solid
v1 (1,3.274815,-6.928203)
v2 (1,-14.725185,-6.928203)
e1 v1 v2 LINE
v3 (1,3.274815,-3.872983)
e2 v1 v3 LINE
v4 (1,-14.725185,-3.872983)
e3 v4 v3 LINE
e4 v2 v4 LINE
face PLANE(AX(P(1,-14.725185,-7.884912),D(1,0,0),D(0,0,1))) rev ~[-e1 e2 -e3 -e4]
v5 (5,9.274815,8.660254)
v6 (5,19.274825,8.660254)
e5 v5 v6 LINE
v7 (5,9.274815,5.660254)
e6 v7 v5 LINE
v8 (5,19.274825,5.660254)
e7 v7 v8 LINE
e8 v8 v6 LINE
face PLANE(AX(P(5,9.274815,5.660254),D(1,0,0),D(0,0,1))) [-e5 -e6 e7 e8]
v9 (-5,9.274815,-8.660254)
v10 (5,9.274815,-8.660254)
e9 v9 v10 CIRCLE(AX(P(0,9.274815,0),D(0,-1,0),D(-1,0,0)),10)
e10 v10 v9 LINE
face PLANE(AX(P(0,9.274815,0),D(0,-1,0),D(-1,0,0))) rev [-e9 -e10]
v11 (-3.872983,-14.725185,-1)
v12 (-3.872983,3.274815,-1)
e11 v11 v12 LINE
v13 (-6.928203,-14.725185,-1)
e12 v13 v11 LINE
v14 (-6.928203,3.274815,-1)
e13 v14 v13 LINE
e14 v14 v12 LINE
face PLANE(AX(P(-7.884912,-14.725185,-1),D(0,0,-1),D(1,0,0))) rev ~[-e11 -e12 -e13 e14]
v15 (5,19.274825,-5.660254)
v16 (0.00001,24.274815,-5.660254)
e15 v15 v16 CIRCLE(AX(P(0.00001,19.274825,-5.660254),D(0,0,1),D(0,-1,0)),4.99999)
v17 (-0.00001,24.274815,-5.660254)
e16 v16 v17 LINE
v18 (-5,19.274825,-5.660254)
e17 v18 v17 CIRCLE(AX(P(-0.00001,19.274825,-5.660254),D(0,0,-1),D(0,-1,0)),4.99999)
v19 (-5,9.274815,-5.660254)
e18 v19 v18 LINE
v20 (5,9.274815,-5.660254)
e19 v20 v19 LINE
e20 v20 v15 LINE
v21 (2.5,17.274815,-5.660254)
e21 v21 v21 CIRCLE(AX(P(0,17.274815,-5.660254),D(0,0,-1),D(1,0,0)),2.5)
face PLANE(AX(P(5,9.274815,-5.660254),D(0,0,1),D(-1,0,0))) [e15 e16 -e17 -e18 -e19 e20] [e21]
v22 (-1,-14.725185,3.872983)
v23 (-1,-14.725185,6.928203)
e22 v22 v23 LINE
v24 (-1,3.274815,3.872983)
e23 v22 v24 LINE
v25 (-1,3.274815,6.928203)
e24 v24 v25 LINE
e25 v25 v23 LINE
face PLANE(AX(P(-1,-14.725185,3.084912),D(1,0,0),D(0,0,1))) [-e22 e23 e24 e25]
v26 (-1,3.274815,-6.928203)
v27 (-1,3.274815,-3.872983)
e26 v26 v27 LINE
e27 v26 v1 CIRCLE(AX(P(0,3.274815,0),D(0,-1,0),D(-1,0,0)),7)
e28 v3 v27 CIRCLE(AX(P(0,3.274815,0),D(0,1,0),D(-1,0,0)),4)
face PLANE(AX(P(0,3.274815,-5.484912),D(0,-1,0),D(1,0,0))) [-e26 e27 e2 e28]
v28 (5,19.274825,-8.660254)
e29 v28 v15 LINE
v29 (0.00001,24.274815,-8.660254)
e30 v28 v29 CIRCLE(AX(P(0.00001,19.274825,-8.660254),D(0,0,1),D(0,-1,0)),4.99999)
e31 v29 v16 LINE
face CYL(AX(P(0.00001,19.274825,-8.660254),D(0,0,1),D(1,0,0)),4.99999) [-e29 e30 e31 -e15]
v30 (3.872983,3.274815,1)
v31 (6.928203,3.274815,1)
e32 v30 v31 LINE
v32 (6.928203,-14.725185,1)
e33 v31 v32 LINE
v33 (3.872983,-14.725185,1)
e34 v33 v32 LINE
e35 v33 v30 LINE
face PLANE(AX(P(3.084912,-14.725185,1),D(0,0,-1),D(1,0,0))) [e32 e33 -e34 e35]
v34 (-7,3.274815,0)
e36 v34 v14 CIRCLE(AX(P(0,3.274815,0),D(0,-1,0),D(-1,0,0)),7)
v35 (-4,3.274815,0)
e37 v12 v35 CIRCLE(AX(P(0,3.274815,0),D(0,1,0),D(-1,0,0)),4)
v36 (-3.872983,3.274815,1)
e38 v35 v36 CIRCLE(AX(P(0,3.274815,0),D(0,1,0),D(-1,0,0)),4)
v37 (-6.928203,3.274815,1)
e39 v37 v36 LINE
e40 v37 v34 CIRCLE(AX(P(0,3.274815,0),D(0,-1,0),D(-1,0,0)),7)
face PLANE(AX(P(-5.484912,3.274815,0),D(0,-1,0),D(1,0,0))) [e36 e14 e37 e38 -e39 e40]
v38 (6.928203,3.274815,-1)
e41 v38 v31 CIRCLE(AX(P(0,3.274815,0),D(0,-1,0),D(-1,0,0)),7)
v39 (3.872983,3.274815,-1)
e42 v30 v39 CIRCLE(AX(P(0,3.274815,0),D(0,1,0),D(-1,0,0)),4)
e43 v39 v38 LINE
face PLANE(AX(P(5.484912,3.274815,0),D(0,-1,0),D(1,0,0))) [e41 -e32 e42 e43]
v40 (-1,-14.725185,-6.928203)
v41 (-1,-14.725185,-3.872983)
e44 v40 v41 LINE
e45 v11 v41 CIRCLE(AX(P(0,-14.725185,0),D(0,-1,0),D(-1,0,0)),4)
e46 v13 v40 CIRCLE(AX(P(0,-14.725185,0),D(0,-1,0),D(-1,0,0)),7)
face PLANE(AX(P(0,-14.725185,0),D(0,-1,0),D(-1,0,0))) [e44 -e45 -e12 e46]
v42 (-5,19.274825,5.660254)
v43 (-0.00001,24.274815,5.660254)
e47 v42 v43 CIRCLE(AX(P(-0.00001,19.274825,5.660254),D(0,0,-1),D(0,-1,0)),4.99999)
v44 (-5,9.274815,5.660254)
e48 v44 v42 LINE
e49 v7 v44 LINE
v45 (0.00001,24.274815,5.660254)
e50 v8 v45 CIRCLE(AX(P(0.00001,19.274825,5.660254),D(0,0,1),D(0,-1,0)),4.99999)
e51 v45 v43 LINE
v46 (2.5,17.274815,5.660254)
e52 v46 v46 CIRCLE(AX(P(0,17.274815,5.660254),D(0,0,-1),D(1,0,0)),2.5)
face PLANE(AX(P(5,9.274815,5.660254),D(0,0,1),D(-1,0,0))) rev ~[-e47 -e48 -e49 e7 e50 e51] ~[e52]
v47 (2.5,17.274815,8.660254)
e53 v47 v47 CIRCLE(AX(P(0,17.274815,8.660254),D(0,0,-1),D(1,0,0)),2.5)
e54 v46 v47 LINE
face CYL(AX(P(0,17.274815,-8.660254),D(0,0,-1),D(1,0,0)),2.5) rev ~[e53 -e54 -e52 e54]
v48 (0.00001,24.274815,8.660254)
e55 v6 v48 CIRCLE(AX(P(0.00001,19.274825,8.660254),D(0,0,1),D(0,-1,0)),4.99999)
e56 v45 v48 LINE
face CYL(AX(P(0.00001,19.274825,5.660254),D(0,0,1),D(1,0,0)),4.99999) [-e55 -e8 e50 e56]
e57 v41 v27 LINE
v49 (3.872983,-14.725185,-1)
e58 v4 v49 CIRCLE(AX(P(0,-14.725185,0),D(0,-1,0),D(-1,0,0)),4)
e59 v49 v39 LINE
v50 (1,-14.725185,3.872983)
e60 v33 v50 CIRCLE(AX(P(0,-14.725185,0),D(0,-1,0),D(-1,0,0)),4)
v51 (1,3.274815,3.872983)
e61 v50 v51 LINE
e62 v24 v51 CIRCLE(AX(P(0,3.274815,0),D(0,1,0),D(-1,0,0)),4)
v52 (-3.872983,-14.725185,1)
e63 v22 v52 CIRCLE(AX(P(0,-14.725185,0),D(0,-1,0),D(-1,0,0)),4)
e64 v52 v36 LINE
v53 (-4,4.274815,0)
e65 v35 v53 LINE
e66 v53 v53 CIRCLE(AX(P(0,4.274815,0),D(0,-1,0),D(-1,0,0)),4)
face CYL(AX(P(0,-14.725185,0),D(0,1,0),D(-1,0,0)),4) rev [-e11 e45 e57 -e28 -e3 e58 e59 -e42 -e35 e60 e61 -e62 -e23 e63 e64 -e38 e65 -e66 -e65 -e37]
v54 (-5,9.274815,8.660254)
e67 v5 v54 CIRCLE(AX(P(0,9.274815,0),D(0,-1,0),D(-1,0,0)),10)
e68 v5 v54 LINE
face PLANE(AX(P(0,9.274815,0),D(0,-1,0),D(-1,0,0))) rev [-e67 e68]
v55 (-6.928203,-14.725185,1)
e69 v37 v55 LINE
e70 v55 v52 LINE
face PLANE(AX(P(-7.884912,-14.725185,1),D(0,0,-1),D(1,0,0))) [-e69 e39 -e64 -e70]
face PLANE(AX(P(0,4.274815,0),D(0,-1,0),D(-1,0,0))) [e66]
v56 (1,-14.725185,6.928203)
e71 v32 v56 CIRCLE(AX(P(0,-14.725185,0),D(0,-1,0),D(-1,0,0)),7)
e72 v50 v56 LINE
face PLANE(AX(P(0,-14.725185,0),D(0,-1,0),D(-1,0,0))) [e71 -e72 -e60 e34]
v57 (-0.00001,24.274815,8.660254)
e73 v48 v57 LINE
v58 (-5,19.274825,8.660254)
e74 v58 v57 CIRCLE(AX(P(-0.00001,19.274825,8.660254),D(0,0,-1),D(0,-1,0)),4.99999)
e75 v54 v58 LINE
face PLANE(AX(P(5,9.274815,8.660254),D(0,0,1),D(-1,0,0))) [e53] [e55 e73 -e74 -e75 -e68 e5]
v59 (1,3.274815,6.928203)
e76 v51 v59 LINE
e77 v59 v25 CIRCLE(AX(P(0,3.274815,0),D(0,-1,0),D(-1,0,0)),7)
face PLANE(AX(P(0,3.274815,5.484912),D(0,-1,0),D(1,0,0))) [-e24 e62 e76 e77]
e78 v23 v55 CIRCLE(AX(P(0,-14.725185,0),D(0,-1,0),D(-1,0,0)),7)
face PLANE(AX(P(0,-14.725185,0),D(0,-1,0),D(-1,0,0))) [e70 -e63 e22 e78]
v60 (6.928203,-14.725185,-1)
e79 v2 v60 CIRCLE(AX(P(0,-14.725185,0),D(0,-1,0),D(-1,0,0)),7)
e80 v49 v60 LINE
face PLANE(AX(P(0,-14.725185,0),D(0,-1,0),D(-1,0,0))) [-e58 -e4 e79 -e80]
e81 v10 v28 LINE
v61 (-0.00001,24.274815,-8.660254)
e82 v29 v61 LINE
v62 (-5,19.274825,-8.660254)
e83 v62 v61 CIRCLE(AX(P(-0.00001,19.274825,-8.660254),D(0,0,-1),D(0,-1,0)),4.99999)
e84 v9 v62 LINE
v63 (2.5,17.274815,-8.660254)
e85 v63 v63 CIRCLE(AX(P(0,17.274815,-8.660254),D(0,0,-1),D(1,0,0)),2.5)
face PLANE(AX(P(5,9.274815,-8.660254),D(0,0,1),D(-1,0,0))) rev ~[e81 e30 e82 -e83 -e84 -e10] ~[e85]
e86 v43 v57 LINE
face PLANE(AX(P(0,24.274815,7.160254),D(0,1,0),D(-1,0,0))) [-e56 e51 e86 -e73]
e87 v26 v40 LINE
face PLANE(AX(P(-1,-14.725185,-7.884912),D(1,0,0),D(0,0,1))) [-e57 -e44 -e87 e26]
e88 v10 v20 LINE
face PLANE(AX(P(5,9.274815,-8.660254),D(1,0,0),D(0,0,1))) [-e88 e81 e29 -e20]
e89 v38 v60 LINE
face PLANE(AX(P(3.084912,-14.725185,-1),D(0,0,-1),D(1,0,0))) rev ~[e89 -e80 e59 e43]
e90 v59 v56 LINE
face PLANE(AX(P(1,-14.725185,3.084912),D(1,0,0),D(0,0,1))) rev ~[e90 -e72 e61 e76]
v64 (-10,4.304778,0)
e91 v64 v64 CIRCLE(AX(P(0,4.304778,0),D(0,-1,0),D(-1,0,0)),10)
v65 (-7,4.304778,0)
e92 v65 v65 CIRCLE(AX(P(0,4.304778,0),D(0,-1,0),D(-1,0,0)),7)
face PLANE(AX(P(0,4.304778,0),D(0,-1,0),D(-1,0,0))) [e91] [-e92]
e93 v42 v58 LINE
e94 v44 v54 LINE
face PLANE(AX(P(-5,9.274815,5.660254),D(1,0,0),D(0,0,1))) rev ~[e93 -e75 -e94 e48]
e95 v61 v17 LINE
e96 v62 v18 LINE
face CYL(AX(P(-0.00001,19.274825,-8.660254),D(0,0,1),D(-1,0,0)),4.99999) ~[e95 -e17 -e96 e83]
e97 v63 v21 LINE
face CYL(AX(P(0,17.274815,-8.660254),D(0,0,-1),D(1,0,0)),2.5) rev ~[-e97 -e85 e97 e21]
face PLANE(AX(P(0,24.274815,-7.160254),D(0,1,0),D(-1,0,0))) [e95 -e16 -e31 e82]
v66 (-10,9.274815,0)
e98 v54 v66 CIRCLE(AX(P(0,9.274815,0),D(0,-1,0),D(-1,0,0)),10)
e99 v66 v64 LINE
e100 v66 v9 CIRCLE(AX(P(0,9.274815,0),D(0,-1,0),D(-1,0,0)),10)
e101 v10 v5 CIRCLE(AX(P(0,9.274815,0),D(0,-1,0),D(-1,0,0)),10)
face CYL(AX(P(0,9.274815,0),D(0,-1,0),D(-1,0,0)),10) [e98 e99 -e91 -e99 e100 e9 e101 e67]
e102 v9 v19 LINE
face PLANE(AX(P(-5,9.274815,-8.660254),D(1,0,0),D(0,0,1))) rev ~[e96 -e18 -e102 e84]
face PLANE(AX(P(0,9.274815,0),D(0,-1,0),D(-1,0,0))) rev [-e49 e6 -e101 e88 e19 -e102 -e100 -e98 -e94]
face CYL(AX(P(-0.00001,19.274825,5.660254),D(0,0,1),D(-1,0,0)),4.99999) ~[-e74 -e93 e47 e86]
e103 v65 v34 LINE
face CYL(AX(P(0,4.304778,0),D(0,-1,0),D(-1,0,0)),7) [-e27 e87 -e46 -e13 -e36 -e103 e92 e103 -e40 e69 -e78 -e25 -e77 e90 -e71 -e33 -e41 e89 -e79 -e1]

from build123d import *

# Parameters (mm, degrees)
F2_W     = 10
F2_H     = 3
F3_DEPTH = 15
F4_R     = 4.99999
F5_R     = 2.5
F6_DEPTH = 18.6612540378
F7_W     = 2
F7_H     = 4.8000003753
F7_W_2   = 4.8000003753
F7_H_2   = 2
F8_DEPTH = 18


# Not quite as in the source:
# - a fillet or chamfer is up to 0.001 mm smaller than in the source, because OpenCascade refuses the exact size


with BuildPart() as f1:
    # F0 (on Top) → F1 (revolve)
    with BuildSketch(Plane.XY):
        Polygon((0, 9.2748147342), (-10, 9.2748147342), (-10, 4.304778154), (-7, 4.304778154), (-7, -14.7251852658), (-4, -14.7251852658), (-4, 4.2748147342), (0, 4.2748147342), align=None)
    revolve(axis=Axis((0, 6.7748147342, 0), (0, -1, 0)))

    # F2 (on face) → F3 (join)
    with BuildSketch(Plane(origin=(0, 9.2748147342, 0), x_dir=(-1, 0, 0), z_dir=(0, 1, 0))):
        with Locations((0, 7.1602540378)):
            Rectangle(F2_W, F2_H)
        with Locations((0, -7.1602540378)):
            Rectangle(F2_W, F2_H)
    extrude(amount=F3_DEPTH)

    # F4 (radius 5 in the source; OpenCascade refuses exactly that, so slightly less here)
    f4_edges = [f1.edges().sort_by_distance(p)[0] for p in [
        (-5, 24.274815, -7.160254),
        (5, 24.274815, -7.160254),
        (5, 24.274815, 7.160254),
        (-5, 24.274815, 7.160254),
    ]]
    fillet(f4_edges, radius=F4_R)

    # F5 (on face) → F6 (cut, through all)
    with BuildSketch(Plane(origin=(0, 0, -8.6602540378), x_dir=(1, 0, 0), z_dir=(0, 0, -1))):
        with Locations((0, -17.2748147342)):
            Circle(F5_R)
    extrude(amount=-F6_DEPTH, mode=Mode.SUBTRACT)

    # F7 (on face) → F8 (cut)
    with BuildSketch(Plane.XZ.offset(14.7251852658)):
        with Locations((0, 5.4849120788)):
            Rectangle(F7_W, F7_H)
        with Locations((-5.4849120788, 0)):
            Rectangle(F7_W_2, F7_H_2)
        with Locations((0, -5.4849120788)):
            Rectangle(F7_W, F7_H)
        with Locations((5.4849120788, 0)):
            Rectangle(F7_W_2, F7_H_2)
    extrude(amount=-F8_DEPTH, mode=Mode.SUBTRACT)


solid = f1.part
